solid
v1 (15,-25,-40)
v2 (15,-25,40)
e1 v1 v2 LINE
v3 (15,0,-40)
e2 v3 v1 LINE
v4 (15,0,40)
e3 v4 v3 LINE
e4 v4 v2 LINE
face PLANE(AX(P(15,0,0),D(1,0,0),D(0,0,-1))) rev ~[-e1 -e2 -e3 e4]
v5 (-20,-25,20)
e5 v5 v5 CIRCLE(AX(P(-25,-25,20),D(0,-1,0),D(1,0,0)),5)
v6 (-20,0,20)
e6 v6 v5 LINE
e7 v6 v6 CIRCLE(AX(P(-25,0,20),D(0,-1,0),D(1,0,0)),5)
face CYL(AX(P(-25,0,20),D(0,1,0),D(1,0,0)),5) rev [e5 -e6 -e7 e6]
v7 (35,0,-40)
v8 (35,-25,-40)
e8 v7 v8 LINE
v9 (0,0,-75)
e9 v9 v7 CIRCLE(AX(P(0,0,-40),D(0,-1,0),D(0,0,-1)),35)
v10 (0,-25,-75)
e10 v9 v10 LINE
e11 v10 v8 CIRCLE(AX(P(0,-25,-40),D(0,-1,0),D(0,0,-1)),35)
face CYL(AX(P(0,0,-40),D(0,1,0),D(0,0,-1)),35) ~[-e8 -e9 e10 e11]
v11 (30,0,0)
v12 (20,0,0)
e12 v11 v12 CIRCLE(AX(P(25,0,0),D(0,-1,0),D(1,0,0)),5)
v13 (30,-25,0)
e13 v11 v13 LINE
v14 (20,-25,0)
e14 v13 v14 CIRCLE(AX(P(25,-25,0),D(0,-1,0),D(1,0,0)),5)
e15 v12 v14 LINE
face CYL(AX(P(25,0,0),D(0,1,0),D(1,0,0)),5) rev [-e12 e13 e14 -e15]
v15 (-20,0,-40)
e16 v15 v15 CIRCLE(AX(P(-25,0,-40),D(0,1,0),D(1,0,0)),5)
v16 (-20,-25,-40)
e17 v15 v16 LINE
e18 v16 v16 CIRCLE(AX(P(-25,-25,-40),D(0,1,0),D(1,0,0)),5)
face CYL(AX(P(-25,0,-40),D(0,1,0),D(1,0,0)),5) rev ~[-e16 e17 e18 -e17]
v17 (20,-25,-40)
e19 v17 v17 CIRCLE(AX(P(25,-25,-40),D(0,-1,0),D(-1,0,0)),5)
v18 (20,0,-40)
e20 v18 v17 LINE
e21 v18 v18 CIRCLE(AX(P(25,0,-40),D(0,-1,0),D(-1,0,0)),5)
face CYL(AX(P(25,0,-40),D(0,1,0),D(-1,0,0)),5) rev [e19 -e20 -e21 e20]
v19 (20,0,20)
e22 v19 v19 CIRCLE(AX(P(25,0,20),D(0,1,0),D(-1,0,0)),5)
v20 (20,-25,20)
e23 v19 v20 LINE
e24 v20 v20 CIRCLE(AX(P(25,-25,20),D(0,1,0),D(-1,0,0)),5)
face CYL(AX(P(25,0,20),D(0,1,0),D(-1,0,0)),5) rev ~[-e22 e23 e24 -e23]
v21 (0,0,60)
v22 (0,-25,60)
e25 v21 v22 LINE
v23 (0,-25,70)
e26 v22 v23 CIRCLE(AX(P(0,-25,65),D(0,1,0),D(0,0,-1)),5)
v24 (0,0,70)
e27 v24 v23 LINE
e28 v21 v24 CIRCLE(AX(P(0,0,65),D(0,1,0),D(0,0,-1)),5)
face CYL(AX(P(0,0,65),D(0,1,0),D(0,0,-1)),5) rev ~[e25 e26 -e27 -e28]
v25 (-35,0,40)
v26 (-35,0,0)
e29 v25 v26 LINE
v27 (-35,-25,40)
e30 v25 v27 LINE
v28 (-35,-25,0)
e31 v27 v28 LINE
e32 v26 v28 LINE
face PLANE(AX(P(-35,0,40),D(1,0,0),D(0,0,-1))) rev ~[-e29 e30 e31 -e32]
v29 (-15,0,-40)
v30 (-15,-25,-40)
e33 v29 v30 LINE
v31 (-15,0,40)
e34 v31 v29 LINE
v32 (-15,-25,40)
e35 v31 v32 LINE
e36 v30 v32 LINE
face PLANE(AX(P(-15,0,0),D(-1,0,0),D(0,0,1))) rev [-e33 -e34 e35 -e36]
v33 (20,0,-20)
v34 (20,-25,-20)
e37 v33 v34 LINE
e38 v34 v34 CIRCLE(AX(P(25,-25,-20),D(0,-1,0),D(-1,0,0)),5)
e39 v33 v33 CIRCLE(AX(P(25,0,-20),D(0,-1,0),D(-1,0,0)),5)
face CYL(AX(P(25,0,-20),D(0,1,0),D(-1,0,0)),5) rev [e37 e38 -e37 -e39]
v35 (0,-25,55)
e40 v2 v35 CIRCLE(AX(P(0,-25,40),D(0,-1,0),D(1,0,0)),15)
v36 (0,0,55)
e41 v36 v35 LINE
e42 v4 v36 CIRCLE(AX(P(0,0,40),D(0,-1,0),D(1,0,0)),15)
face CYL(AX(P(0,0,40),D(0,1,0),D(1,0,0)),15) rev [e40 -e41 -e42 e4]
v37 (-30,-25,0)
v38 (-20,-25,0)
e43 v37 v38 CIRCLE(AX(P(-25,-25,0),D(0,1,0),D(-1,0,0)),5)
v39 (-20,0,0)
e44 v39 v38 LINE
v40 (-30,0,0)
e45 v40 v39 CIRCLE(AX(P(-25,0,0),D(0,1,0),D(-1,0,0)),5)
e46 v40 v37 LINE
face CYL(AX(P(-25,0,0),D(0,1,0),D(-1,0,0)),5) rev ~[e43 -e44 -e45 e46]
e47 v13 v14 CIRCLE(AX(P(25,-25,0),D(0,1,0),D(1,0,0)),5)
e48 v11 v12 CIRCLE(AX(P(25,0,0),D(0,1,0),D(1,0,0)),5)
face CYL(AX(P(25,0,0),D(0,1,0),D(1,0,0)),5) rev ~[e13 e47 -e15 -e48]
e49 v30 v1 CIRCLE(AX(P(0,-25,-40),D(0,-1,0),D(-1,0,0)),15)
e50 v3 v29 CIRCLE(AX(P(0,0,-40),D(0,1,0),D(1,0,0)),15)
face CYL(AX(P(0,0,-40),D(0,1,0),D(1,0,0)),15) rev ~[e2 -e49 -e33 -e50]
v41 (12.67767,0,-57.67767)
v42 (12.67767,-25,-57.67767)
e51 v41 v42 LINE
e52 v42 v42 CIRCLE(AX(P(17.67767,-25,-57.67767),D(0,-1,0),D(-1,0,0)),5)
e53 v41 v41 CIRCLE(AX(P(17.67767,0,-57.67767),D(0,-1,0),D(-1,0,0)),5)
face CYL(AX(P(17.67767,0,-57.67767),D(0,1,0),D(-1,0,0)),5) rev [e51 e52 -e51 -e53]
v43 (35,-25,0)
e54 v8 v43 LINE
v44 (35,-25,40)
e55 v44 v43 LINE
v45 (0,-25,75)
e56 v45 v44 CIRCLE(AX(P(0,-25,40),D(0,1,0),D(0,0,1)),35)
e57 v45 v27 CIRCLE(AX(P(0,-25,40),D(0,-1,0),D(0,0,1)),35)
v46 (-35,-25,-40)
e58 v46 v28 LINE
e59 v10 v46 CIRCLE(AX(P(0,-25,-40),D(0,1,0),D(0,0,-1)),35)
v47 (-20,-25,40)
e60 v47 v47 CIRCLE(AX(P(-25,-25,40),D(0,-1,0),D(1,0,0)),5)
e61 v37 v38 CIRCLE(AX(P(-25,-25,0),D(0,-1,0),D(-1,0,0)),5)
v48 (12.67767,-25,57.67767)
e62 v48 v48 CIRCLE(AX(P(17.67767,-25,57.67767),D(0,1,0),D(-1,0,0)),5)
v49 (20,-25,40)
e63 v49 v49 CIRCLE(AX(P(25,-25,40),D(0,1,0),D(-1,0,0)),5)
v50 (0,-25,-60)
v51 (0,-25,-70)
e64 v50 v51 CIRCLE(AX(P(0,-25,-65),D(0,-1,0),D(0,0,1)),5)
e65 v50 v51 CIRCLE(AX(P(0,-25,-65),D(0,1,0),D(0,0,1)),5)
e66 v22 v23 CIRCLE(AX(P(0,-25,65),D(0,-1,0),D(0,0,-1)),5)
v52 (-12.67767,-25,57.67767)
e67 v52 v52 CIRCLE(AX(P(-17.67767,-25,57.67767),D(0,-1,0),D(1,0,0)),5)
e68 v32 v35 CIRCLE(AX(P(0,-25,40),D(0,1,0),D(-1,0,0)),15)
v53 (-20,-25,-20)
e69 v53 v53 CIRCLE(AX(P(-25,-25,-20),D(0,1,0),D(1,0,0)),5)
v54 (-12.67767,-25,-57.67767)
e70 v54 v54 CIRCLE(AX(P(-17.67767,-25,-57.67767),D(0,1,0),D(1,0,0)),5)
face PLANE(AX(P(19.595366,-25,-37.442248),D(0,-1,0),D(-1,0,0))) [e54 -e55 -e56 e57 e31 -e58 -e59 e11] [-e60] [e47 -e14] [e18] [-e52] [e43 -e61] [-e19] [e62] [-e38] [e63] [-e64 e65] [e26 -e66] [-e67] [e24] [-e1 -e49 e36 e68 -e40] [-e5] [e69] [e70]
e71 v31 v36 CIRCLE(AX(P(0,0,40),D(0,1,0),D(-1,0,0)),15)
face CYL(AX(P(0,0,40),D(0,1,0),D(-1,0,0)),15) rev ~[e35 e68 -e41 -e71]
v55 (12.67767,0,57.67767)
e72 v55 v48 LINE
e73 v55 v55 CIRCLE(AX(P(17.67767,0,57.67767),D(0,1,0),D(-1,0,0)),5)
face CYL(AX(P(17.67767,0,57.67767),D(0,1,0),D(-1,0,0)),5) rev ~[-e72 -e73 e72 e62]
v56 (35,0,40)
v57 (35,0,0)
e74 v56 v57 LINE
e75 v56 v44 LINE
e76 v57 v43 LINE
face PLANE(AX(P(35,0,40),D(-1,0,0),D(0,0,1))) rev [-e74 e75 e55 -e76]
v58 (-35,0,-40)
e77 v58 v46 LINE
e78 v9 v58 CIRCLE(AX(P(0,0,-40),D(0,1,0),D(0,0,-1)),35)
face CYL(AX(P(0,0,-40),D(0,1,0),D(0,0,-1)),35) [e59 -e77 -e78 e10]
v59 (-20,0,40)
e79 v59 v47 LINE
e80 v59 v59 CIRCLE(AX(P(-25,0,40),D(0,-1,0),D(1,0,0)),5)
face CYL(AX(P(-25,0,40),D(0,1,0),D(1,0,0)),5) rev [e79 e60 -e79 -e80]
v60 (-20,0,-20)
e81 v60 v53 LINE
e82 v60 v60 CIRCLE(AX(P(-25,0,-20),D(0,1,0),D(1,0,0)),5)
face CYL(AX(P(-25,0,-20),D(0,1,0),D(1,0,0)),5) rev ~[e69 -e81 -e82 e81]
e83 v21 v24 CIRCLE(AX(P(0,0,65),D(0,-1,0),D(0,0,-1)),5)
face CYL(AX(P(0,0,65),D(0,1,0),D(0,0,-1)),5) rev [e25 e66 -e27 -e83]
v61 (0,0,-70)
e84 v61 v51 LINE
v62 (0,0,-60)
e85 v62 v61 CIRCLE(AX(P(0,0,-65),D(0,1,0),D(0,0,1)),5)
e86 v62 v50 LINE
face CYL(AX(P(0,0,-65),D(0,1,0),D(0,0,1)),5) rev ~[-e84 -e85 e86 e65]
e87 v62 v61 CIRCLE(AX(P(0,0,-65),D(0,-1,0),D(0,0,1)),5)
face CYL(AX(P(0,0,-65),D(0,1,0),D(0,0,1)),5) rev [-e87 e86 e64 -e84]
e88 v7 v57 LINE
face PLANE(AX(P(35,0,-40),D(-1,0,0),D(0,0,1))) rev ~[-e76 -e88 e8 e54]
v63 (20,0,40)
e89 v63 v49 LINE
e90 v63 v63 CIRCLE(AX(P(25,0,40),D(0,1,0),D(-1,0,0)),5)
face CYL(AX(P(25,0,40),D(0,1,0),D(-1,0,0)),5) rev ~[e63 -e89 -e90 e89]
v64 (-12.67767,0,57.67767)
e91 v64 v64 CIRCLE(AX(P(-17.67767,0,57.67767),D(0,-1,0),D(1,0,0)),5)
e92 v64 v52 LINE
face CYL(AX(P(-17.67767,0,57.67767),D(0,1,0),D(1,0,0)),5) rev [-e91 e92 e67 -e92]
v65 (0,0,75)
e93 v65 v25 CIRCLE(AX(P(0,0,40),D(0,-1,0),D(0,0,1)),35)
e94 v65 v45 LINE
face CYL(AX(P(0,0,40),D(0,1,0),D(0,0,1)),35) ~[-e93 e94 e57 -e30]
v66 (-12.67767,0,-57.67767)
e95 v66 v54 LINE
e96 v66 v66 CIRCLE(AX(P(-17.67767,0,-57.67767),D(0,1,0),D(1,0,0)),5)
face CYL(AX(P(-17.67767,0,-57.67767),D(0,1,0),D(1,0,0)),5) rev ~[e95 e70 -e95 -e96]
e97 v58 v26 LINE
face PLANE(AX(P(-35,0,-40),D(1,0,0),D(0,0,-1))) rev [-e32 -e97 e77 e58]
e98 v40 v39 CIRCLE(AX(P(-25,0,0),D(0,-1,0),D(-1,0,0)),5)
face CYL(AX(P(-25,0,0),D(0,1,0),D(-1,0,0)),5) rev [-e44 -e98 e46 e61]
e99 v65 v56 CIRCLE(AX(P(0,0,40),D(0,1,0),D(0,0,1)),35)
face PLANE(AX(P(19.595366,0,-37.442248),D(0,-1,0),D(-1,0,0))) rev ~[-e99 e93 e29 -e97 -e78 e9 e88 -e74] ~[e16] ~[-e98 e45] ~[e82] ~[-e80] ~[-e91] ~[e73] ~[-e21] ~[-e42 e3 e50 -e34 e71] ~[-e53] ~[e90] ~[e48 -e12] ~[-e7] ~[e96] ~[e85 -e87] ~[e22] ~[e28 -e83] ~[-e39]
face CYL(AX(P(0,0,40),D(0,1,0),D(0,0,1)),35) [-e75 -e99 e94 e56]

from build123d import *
from build123d import SkipClean  # not in build123d's __all__

# Parameters (mm, degrees)
F0_R     = 5
F1_DEPTH = 25


with BuildPart() as f1:
    # F0 (on Front) → F1 (new body)
    with BuildSketch(Plane.XZ):
        with BuildLine():
            ThreePointArc((-15, 40), (-10.6066017178, 50.6066017178), (0, 55))
            Line((0, 55), (0, 60))
            ThreePointArc((0, 60), (-5, 65), (0, 70))
            Line((0, 70), (0, 75))
            ThreePointArc((0, 75), (-24.7487373415, 64.7487373415), (-35, 40))
            Line((-35, 40), (-35, 0))
            Line((-35, 0), (-30, 0))
            ThreePointArc((-30, 0), (-25, 5), (-20, 0))
            Line((-20, 0), (-15, 0))
            Line((-15, 0), (-15, 40))
        make_face()
        with Locations((-25, 20)):
            Circle(F0_R, mode=Mode.SUBTRACT)
        with Locations((-25, 40)):
            Circle(F0_R, mode=Mode.SUBTRACT)
        with Locations((-17.6776695297, 57.6776695297)):
            Circle(F0_R, mode=Mode.SUBTRACT)
    extrude(amount=F1_DEPTH)

    # F2: F1 across plane


with BuildPart() as f1_1:
    add(f1.part, clean=False)
    with SkipClean():  # cleaning this boolean's faces spoils the solid; the shape is the same uncleaned
        add(f1.part.mirror(Plane.YZ), clean=False)

    # F3: F1 across plane


with BuildPart() as f1_2:
    add(f1_1.part, clean=False)
    add(f1_1.part.mirror(Plane.XY), clean=False)


solid = f1_2.part
